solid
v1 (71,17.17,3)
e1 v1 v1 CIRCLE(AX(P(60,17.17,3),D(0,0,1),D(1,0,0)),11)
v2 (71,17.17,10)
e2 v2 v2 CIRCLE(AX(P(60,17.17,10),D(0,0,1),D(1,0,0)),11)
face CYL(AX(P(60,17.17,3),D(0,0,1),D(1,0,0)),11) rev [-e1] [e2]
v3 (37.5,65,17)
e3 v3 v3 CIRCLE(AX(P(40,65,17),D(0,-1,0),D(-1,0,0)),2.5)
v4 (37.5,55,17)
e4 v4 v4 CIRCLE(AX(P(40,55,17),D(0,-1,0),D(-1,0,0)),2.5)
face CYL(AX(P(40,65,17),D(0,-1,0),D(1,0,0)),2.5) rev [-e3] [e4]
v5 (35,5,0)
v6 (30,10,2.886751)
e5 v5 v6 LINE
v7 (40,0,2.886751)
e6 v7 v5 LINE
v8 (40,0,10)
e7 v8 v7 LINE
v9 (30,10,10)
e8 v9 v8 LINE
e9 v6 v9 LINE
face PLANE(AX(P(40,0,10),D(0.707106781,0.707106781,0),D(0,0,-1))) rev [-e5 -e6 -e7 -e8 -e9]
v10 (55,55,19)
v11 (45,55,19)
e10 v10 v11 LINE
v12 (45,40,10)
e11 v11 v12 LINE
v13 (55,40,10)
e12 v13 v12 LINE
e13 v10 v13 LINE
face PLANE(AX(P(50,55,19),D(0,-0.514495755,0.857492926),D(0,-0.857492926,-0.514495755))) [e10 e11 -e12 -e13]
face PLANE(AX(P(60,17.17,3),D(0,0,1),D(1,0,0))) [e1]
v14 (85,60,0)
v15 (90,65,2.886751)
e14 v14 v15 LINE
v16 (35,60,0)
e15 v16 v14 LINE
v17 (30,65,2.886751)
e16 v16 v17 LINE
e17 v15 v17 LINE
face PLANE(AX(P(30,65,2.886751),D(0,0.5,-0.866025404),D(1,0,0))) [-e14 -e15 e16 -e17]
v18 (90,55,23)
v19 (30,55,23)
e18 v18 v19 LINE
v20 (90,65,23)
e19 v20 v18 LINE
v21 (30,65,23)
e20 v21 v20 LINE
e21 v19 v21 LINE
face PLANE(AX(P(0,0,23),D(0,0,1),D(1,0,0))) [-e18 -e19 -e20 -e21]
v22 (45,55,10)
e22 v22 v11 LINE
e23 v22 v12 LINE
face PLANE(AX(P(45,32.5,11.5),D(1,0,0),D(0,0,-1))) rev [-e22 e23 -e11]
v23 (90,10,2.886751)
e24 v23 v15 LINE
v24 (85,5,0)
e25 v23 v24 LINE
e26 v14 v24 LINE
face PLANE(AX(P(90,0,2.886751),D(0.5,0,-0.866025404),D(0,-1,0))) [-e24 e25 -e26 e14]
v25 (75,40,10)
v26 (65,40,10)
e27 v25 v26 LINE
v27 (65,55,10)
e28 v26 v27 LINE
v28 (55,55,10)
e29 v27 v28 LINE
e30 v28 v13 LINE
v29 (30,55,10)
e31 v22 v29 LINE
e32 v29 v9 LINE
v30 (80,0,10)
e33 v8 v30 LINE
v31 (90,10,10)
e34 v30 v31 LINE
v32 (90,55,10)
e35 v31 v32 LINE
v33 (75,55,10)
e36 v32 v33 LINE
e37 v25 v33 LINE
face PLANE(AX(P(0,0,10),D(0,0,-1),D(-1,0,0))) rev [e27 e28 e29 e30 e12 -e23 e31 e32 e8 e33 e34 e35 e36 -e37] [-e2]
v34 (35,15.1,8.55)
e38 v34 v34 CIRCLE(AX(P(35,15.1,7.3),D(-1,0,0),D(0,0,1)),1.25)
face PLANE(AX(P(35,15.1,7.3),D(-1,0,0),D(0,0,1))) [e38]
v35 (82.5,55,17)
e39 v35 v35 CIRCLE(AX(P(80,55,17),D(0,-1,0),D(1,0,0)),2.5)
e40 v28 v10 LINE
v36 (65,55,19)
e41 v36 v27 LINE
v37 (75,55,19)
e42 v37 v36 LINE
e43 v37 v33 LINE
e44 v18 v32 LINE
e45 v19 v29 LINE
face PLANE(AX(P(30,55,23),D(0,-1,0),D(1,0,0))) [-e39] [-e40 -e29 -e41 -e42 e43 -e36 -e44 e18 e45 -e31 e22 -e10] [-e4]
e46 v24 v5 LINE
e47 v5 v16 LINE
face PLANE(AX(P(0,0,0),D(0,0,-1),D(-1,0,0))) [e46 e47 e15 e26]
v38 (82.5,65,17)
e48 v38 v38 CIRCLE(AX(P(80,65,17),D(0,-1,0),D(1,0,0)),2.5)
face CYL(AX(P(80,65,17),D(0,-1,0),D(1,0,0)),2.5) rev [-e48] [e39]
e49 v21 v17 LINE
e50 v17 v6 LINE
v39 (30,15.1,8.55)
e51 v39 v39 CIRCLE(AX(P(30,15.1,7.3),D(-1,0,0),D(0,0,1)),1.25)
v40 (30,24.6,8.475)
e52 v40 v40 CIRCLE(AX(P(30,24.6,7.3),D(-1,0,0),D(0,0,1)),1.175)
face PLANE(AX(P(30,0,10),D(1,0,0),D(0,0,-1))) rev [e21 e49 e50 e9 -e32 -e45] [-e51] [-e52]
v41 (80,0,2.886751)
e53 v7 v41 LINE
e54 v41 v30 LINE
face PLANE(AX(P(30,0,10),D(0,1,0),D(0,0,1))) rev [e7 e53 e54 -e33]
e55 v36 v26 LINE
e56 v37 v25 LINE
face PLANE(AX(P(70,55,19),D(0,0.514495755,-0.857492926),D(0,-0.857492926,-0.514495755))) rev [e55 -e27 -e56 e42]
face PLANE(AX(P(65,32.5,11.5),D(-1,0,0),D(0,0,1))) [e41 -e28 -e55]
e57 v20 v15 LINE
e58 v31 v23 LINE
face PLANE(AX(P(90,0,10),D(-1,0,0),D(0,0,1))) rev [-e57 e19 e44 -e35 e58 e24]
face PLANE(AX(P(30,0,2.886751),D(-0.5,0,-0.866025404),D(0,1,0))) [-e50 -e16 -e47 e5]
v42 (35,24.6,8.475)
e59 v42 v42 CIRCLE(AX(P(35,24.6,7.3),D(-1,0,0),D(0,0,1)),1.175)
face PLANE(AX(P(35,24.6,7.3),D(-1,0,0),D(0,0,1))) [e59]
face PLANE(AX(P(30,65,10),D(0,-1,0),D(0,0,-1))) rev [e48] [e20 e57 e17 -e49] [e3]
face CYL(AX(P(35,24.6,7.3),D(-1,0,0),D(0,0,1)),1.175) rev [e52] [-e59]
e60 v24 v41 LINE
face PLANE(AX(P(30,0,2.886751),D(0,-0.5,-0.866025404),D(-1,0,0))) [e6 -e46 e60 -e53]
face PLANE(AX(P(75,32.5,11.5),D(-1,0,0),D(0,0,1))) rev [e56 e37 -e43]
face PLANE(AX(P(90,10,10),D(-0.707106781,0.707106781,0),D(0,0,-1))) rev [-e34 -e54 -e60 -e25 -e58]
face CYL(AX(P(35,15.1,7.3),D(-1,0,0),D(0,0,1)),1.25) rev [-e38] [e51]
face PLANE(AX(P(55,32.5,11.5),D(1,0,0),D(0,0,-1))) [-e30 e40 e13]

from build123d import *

# Parameters (mm, degrees)
SKETCH1_W           = 60
SKETCH1_H           = 65
BOSS_EXTRUDE1_DEPTH = 10
SKETCH6_W           = 60
SKETCH6_H           = 10
BOSS_EXTRUDE2_DEPTH = 23
CHAMFER1_SIZE       = 5
CHAMFER1_SIZE2      = 2.886751346
SKETCH5_R           = 11
CUT_EXTRUDE4_DEPTH  = 7
SKETCH12_R          = 2.5
CUT_EXTRUDE6_DEPTH  = 108.953693777
RIB1_REACH          = 81.712
SKETCH13_WALL_W     = 178.916818752
SKETCH13_WALL_H     = 10
CHAMFER3_START      = -1
CHAMFER3_DEPTH      = 24
SKETCH14_R          = 1.175
SKETCH14_R_2        = 1.25
CUT_EXTRUDE7_DEPTH  = 5


with BuildPart() as part:
    # Sketch1 → Boss-Extrude1 (new body)
    with BuildSketch(Plane.XY):
        with Locations((60, 32.5)):
            Rectangle(SKETCH1_W, SKETCH1_H)
    extrude(amount=BOSS_EXTRUDE1_DEPTH)

    # Sketch6 → Boss-Extrude2 (add)
    with BuildSketch(Plane(origin=(0, 0, 0), x_dir=(-1, 0, 0), z_dir=(0, 0, -1))):
        with Locations((-60, 60)):
            Rectangle(SKETCH6_W, SKETCH6_H)
    extrude(amount=-BOSS_EXTRUDE2_DEPTH)

    # Chamfer1
    chamfer1_edges = [part.edges().sort_by_distance(p)[0] for p in [
        (60, 65, 0),
        (90, 32.5, 0),
        (60, 0, 0),
        (30, 32.5, 0),
    ]]
    chamfer1_side = [part.faces().sort_by_distance(p)[0] for p in [
        (60, 32.5, 0),
    ]]
    chamfer(chamfer1_edges, length=CHAMFER1_SIZE, length2=CHAMFER1_SIZE2, reference=chamfer1_side[0])

    # Sketch5 → Cut-Extrude4 (cut)
    with BuildSketch(Plane.XY.offset(10)):
        with Locations((60, 17.17)):
            Circle(SKETCH5_R)
    extrude(amount=-CUT_EXTRUDE4_DEPTH, mode=Mode.SUBTRACT)

    # Sketch12 → Cut-Extrude6 (cut, through all)
    with BuildSketch(Plane(origin=(0, 55, 0), x_dir=(-1, 0, 0), z_dir=(0, -1, 0))):
        with Locations(Location((-80, -17, 0), (0, 0, 180))):
            Circle(SKETCH12_R)
        with Locations((-40, -17)):
            Circle(SKETCH12_R)
    extrude(amount=-CUT_EXTRUDE6_DEPTH, mode=Mode.SUBTRACT)

    # Sketch13 wall → Rib1 (add, up to next)
    with BuildSketch(Plane(origin=(50, 47.5, 14.5), x_dir=(0, -0.857492925713, -0.514495755428), z_dir=(0, 0.514495755428, -0.857492925713)), mode=Mode.PRIVATE) as rib1_sk1:
        Rectangle(SKETCH13_WALL_W, SKETCH13_WALL_H)
    rib1_tool1 = extrude(rib1_sk1.sketch, amount=RIB1_REACH, mode=Mode.PRIVATE) - part.part
    rib1 = rib1_tool1.solids().sort_by_distance((50, 47.5, 14.5))[0]
    add(rib1)

    # Mirror1: Rib1 across plane
    add(rib1.mirror(Plane(origin=(60, 0, 0), x_dir=(0, 0, 1), z_dir=(1, 0, 0))))

    # Chamfer3: read off the stored shape, not the designer's step
    # Chamfer3 outline → Chamfer3 (cut)
    with BuildSketch(Plane.XY.offset(CHAMFER3_START)):
        Polygon((90, 0), (90, 10), (80, 0), align=None)
        Polygon((30, 0), (40, 0), (30, 10), align=None)
    extrude(amount=CHAMFER3_DEPTH, mode=Mode.SUBTRACT)

    # Sketch14 → Cut-Extrude7 (cut)
    with BuildSketch(Plane.ZY.offset(-30)):
        with Locations((7.3, 24.6)):
            Circle(SKETCH14_R)
        with Locations((7.3, 15.1)):
            Circle(SKETCH14_R_2)
    extrude(amount=-CUT_EXTRUDE7_DEPTH, mode=Mode.SUBTRACT)


solid = part.part
